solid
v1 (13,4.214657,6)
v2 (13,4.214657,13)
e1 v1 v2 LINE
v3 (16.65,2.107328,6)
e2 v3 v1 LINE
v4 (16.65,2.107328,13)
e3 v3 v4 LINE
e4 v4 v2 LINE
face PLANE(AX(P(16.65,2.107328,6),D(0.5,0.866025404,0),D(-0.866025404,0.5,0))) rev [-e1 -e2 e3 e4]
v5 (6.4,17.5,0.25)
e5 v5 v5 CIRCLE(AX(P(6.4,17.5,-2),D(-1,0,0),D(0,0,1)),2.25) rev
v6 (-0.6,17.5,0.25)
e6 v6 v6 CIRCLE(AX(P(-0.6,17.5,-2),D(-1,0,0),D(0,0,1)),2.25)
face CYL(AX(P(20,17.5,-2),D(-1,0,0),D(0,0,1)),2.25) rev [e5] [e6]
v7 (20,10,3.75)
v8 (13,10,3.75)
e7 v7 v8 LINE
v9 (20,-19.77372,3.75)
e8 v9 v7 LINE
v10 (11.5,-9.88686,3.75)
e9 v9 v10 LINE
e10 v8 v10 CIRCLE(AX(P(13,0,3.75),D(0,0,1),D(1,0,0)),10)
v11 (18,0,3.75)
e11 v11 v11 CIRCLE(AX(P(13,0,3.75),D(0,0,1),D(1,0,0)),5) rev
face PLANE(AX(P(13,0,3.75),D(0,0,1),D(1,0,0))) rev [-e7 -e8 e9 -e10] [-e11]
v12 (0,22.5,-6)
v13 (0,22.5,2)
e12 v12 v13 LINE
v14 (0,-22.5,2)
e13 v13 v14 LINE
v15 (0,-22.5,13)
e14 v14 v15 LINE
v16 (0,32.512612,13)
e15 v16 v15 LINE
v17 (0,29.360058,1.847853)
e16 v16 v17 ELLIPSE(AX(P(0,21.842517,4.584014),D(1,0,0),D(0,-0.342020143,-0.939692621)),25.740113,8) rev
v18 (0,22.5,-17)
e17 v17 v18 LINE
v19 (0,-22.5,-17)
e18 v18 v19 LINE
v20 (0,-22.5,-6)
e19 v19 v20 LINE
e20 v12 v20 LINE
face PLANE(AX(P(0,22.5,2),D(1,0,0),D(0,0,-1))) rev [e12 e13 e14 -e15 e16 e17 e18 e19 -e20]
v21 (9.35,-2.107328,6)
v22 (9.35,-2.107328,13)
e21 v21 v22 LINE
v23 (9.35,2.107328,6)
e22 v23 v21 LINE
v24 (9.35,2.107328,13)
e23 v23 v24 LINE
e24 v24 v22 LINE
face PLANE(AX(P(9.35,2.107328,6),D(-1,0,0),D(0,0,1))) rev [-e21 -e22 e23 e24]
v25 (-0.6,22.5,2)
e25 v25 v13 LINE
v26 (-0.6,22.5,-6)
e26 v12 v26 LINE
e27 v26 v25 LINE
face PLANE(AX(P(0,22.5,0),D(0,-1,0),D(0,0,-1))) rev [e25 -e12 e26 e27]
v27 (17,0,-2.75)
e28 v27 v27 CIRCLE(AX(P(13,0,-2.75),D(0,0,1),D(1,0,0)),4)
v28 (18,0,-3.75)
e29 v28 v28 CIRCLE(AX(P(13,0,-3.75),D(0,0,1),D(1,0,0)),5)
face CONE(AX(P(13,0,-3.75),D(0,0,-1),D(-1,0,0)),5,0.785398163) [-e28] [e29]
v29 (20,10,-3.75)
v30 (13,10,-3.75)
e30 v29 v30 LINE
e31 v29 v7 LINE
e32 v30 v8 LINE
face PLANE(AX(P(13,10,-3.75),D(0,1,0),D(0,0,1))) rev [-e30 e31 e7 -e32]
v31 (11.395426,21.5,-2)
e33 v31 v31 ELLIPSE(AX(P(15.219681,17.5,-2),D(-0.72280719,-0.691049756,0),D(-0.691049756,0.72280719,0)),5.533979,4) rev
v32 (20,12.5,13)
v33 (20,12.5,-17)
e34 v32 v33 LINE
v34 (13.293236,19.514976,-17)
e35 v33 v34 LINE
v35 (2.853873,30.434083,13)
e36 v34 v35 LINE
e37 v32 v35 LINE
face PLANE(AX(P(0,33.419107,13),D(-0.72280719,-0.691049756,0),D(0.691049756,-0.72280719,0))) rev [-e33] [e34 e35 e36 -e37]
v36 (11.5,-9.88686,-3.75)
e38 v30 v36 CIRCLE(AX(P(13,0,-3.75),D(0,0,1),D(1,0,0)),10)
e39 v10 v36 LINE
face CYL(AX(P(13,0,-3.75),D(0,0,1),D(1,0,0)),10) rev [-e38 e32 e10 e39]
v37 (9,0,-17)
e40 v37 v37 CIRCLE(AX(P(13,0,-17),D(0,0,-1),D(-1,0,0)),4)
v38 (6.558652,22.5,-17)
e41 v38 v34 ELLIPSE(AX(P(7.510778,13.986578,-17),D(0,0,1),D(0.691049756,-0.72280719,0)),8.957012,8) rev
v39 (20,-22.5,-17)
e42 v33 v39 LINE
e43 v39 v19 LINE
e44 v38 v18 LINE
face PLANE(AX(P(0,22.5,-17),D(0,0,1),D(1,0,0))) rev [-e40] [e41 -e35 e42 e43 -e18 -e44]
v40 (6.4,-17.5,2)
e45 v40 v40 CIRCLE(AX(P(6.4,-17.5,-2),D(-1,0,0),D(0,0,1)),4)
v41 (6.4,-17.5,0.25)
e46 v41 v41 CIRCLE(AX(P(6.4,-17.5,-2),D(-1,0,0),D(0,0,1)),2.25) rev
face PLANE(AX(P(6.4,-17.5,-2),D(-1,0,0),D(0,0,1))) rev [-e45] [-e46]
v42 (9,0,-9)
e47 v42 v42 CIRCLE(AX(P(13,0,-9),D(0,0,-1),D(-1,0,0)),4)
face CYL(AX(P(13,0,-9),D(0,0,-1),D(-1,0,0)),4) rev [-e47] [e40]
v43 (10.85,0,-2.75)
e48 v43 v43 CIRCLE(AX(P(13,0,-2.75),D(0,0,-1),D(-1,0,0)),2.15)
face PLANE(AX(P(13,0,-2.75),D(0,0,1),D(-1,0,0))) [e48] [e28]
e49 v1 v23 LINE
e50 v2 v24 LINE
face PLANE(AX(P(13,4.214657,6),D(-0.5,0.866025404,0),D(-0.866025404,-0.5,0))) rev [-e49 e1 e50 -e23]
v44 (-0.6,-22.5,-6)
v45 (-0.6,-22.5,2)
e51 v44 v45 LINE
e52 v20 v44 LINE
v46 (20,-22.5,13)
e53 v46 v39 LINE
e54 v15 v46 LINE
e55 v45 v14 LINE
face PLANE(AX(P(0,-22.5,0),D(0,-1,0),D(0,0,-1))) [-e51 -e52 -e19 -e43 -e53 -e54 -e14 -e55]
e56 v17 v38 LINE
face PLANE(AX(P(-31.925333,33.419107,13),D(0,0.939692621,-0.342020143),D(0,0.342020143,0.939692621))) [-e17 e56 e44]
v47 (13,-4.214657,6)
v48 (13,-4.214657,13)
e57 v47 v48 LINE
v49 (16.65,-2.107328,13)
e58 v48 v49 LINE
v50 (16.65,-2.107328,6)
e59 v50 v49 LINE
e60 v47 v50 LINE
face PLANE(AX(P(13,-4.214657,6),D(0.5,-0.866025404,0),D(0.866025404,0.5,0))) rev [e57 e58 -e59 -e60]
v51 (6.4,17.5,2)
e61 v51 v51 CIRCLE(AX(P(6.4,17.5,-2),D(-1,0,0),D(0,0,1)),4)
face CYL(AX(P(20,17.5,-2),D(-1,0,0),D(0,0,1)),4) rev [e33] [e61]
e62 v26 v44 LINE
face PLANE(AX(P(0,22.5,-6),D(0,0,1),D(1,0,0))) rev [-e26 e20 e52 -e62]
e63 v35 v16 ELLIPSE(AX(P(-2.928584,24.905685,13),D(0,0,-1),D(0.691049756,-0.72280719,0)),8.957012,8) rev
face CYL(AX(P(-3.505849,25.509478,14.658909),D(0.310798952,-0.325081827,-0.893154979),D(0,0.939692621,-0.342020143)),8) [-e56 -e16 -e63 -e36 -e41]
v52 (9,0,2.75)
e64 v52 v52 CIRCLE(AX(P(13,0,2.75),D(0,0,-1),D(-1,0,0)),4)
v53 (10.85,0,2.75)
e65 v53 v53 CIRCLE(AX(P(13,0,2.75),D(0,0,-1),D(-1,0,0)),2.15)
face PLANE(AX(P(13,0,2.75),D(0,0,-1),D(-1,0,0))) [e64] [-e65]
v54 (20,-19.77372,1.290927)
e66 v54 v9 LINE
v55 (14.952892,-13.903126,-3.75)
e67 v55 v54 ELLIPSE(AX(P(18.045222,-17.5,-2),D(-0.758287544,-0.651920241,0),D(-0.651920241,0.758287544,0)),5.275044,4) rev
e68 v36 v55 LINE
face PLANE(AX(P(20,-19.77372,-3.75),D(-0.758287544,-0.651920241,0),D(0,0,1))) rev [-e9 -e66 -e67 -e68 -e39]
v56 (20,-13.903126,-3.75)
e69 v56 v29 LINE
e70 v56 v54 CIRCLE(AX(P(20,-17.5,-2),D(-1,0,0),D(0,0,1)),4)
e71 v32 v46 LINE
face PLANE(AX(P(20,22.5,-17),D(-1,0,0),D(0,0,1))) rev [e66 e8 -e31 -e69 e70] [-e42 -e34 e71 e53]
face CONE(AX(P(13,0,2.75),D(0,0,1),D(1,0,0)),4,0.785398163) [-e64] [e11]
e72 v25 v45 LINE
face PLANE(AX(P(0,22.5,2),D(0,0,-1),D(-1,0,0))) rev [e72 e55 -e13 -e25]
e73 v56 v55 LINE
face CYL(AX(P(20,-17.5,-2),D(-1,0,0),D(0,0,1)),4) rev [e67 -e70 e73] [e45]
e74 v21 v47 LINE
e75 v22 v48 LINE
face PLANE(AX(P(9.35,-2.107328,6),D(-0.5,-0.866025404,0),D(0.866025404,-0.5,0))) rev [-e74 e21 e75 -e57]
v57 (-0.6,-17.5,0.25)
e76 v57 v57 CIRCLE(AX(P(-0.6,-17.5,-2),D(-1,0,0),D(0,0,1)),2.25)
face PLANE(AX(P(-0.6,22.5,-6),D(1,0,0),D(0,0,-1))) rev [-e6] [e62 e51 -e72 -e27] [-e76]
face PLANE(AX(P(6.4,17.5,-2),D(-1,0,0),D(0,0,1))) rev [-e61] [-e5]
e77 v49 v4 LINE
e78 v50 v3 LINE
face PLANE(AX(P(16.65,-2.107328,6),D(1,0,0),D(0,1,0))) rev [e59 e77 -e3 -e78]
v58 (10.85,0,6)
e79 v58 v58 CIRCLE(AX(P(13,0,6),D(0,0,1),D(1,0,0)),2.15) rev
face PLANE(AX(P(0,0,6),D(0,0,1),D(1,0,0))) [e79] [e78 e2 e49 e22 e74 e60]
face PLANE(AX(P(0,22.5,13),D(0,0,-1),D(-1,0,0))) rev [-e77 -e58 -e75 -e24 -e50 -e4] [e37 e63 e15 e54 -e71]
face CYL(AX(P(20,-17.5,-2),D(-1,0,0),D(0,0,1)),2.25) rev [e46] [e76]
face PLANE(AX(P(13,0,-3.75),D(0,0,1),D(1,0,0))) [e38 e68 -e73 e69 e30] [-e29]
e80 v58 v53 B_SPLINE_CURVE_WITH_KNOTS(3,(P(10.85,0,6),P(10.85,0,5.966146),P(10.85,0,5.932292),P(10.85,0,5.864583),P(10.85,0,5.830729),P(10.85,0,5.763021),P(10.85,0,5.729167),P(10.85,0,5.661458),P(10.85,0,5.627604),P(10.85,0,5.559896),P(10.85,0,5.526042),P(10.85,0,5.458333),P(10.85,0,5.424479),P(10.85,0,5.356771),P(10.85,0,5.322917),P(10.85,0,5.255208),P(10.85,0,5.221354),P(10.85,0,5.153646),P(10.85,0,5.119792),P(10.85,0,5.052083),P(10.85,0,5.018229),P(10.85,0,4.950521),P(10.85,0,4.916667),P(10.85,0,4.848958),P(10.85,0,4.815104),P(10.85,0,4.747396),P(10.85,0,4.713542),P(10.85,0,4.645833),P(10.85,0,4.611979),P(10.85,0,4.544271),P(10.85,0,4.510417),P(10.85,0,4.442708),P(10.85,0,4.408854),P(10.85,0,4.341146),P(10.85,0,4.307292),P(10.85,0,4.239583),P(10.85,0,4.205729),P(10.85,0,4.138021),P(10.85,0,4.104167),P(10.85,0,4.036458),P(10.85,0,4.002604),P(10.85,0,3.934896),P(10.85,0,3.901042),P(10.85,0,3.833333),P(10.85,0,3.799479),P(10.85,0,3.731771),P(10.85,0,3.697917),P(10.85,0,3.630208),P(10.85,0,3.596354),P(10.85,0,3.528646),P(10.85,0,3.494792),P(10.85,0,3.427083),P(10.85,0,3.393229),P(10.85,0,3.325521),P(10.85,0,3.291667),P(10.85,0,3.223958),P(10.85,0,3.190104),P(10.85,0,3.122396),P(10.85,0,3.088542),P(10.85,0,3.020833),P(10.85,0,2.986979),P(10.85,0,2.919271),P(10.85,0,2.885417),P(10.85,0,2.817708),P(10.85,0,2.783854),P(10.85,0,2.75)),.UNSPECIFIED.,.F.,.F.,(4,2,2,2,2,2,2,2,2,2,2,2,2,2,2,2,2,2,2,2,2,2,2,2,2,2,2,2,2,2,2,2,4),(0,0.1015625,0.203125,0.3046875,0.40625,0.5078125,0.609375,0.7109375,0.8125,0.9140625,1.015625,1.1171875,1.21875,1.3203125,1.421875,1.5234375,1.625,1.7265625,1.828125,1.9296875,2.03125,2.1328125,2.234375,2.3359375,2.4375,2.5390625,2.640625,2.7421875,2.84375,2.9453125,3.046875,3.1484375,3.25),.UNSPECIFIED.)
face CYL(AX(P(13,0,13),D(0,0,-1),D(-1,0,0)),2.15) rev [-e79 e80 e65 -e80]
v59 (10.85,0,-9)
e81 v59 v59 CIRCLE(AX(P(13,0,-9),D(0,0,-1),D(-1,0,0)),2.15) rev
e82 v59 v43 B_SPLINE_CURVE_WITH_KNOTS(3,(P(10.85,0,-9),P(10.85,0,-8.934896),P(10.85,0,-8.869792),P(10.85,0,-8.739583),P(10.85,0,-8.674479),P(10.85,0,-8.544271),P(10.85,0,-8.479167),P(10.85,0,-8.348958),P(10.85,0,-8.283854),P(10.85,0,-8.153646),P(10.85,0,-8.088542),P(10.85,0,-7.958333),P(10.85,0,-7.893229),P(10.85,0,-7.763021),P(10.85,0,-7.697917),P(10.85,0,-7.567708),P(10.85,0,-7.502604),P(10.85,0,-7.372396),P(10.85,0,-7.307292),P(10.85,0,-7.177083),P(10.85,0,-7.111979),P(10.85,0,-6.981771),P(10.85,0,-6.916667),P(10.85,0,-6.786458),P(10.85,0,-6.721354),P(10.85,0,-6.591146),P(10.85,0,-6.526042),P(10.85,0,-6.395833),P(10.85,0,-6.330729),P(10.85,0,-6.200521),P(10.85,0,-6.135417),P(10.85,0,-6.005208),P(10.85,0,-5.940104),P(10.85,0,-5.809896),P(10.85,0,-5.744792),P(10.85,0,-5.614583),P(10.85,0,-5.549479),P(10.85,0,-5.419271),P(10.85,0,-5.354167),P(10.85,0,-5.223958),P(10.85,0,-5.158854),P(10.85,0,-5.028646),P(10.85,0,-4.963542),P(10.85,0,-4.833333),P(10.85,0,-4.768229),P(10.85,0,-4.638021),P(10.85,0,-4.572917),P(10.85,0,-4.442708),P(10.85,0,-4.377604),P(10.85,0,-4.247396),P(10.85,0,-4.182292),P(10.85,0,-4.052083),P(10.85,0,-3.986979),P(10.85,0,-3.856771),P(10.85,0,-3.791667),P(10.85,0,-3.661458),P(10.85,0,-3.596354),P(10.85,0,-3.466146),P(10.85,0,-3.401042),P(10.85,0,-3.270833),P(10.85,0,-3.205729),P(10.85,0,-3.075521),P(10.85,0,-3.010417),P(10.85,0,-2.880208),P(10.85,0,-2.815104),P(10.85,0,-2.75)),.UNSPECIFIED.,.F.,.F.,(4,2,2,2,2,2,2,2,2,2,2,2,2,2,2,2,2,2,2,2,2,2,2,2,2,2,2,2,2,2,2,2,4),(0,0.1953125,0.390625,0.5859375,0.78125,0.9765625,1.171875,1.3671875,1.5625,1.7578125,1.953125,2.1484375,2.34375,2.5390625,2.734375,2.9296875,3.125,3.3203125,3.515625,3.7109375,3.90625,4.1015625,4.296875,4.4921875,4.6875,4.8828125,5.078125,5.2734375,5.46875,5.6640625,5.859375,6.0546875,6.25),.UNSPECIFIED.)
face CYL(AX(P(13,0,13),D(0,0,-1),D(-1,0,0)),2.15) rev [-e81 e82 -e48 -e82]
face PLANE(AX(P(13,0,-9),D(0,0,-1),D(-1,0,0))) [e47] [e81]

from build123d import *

# Parameters (mm, degrees)
BOSS_EXTRUDE1_DEPTH = 22.5
CUT_EXTRUDE1_DEPTH  = 3.75
SKETCH3_R           = 2.15
CUT_EXTRUDE2_DEPTH  = 43.5
CUT_EXTRUDE3_DEPTH  = 7
SKETCH5_R           = 4
CUT_EXTRUDE4_DEPTH  = 8
CHAMFER4_START      = -3.75
CHAMFER4_DEPTH      = 7.5
SKETCH7_R           = 2.25
CUT_EXTRUDE5_DEPTH  = 35.922915113
CUT_EXTRUDE6_START  = -7
SKETCH8_R           = 4
CUT_EXTRUDE6_DEPTH  = 28.922915113
BOSS_EXTRUDE2_DEPTH = 20
CUT_EXTRUDE7_DEPTH  = 50.161333531
FILLET1_R           = 8
BOSS_EXTRUDE3_START = 1
SKETCH11_R          = 5
SKETCH11_R_2        = 2.15
BOSS_EXTRUDE3_DEPTH = 1
CHAMFER5_SIZE       = 1


with BuildPart() as part:
    # Sketch1 → Boss-Extrude1 (new, symmetric)
    with BuildSketch(Plane(origin=(0, 0, 0), x_dir=(1, 0, 0), z_dir=(0, 1, 0))):
        Polygon((0, -2), (0, -13), (20, -13), (20, 17), (0, 17), (0, 6), (-0.6, 6), (-0.6, -2), align=None)
    extrude(amount=BOSS_EXTRUDE1_DEPTH, both=True)

    # Sketch2 → Cut-Extrude1 (cut, symmetric)
    with BuildSketch(Plane.XY):
        with BuildLine():
            Line((13, 10), (20, 10))
            ThreePointArc((20, 10), (30, 0), (20, -10))
            Line((20, -10), (13, -10))
            ThreePointArc((13, -10), (3, 0), (13, 10))
        make_face()
    extrude(amount=CUT_EXTRUDE1_DEPTH, both=True, mode=Mode.SUBTRACT)

    # Sketch3 → Cut-Extrude2 (cut, through all)
    with BuildSketch(Plane(origin=(0, 0, -17), x_dir=(-1, 0, 0), z_dir=(0, 0, -1))):
        with Locations((-13, 0)):
            Circle(SKETCH3_R)
    extrude(amount=-CUT_EXTRUDE2_DEPTH, mode=Mode.SUBTRACT)

    # Sketch4 → Cut-Extrude3 (cut)
    with BuildSketch(Plane.XY.offset(13)):
        Polygon((13, -4.214656965), (16.65, -2.107328483), (16.65, 2.107328483), (13, 4.214656965), (9.35, 2.107328483), (9.35, -2.107328483), align=None)
    extrude(amount=-CUT_EXTRUDE3_DEPTH, mode=Mode.SUBTRACT)

    # Sketch5 → Cut-Extrude4 (cut)
    with BuildSketch(Plane(origin=(0, 0, -17), x_dir=(-1, 0, 0), z_dir=(0, 0, -1))):
        with Locations((-13, 0)):
            Circle(SKETCH5_R)
    extrude(amount=-CUT_EXTRUDE4_DEPTH, mode=Mode.SUBTRACT)

    # Chamfer4: read off the stored shape, not the designer's step
    # Chamfer4 outline → Chamfer4 (cut)
    with BuildSketch(Plane.XY.offset(CHAMFER4_START)):
        with BuildLine():
            ThreePointArc((13, -10), (12.247869581, -9.971674876), (11.5, -9.886859967))
            Line((11.5, -9.886859967), (20, -19.773719933))
            Line((20, -19.773719933), (20, -10))
            Line((20, -10), (13, -10))
        make_face()
    extrude(amount=CHAMFER4_DEPTH, mode=Mode.SUBTRACT)

    # Sketch7 → Cut-Extrude5 (cut, through all)
    with BuildSketch(Plane.ZY.offset(0.6)):
        with Locations((-2, 17.5)):
            Circle(SKETCH7_R)
        with Locations((-2, -17.5)):
            Circle(SKETCH7_R)
    extrude(amount=-CUT_EXTRUDE5_DEPTH, mode=Mode.SUBTRACT)

    # Sketch8 → Cut-Extrude6 (cut, through all)
    with BuildSketch(Plane.ZY.offset(0.6).offset(CUT_EXTRUDE6_START)):
        with Locations((-2, 17.5)):
            Circle(SKETCH8_R)
        with Locations((-2, -17.5)):
            Circle(SKETCH8_R)
    extrude(amount=-CUT_EXTRUDE6_DEPTH, mode=Mode.SUBTRACT)

    # Sketch9 → Boss-Extrude2 (add)
    with BuildSketch(Plane(origin=(20, 0, 0), x_dir=(0, 0, -1), z_dir=(1, 0, 0))):
        Polygon((17, 22.5), (-13, 22.5), (-13, 33.419107028), align=None)
    extrude(amount=-BOSS_EXTRUDE2_DEPTH)

    # Sketch10 → Cut-Extrude7 (cut, through all)
    with BuildSketch(Plane(origin=(0, 0, -17), x_dir=(-1, 0, 0), z_dir=(0, 0, -1))):
        Polygon((-20, 12.5), (-20, 33.419107028), (0, 33.419107028), align=None)
    extrude(amount=-CUT_EXTRUDE7_DEPTH, mode=Mode.SUBTRACT)

    # Fillet1
    fillet1_edges = [part.edges().sort_by_distance(p)[0] for p in [
        (5.219681229, 27.959553514, -2),
    ]]
    fillet(fillet1_edges, radius=FILLET1_R)

    # Sketch11 → Boss-Extrude3 (add)
    with BuildSketch(Plane(origin=(0, 0, 3.75), x_dir=(-1, 0, 0), z_dir=(0, 0, -1)).offset(BOSS_EXTRUDE3_START)):
        with Locations(Location((-13, 0, 0), (0, 0, 180))):
            Circle(SKETCH11_R)
        with Locations((-13, 0)):
            Circle(SKETCH11_R_2, mode=Mode.SUBTRACT)
    boss_extrude3 = extrude(amount=-BOSS_EXTRUDE3_DEPTH)

    # Mirror1: Boss-Extrude3 across plane
    add(boss_extrude3.mirror(Plane(origin=(0, 0, 0), x_dir=(1, 0, 0), z_dir=(0, 0, -1))))

    # Chamfer5
    chamfer5_edges = [part.edges().sort_by_distance(p)[0] for p in [
        (8, 0, 2.75),
        (8, 0, -2.75),
    ]]
    chamfer(chamfer5_edges, length=CHAMFER5_SIZE - 0.0001)  # a hair under: the kernel refuses the full size


solid = part.part
